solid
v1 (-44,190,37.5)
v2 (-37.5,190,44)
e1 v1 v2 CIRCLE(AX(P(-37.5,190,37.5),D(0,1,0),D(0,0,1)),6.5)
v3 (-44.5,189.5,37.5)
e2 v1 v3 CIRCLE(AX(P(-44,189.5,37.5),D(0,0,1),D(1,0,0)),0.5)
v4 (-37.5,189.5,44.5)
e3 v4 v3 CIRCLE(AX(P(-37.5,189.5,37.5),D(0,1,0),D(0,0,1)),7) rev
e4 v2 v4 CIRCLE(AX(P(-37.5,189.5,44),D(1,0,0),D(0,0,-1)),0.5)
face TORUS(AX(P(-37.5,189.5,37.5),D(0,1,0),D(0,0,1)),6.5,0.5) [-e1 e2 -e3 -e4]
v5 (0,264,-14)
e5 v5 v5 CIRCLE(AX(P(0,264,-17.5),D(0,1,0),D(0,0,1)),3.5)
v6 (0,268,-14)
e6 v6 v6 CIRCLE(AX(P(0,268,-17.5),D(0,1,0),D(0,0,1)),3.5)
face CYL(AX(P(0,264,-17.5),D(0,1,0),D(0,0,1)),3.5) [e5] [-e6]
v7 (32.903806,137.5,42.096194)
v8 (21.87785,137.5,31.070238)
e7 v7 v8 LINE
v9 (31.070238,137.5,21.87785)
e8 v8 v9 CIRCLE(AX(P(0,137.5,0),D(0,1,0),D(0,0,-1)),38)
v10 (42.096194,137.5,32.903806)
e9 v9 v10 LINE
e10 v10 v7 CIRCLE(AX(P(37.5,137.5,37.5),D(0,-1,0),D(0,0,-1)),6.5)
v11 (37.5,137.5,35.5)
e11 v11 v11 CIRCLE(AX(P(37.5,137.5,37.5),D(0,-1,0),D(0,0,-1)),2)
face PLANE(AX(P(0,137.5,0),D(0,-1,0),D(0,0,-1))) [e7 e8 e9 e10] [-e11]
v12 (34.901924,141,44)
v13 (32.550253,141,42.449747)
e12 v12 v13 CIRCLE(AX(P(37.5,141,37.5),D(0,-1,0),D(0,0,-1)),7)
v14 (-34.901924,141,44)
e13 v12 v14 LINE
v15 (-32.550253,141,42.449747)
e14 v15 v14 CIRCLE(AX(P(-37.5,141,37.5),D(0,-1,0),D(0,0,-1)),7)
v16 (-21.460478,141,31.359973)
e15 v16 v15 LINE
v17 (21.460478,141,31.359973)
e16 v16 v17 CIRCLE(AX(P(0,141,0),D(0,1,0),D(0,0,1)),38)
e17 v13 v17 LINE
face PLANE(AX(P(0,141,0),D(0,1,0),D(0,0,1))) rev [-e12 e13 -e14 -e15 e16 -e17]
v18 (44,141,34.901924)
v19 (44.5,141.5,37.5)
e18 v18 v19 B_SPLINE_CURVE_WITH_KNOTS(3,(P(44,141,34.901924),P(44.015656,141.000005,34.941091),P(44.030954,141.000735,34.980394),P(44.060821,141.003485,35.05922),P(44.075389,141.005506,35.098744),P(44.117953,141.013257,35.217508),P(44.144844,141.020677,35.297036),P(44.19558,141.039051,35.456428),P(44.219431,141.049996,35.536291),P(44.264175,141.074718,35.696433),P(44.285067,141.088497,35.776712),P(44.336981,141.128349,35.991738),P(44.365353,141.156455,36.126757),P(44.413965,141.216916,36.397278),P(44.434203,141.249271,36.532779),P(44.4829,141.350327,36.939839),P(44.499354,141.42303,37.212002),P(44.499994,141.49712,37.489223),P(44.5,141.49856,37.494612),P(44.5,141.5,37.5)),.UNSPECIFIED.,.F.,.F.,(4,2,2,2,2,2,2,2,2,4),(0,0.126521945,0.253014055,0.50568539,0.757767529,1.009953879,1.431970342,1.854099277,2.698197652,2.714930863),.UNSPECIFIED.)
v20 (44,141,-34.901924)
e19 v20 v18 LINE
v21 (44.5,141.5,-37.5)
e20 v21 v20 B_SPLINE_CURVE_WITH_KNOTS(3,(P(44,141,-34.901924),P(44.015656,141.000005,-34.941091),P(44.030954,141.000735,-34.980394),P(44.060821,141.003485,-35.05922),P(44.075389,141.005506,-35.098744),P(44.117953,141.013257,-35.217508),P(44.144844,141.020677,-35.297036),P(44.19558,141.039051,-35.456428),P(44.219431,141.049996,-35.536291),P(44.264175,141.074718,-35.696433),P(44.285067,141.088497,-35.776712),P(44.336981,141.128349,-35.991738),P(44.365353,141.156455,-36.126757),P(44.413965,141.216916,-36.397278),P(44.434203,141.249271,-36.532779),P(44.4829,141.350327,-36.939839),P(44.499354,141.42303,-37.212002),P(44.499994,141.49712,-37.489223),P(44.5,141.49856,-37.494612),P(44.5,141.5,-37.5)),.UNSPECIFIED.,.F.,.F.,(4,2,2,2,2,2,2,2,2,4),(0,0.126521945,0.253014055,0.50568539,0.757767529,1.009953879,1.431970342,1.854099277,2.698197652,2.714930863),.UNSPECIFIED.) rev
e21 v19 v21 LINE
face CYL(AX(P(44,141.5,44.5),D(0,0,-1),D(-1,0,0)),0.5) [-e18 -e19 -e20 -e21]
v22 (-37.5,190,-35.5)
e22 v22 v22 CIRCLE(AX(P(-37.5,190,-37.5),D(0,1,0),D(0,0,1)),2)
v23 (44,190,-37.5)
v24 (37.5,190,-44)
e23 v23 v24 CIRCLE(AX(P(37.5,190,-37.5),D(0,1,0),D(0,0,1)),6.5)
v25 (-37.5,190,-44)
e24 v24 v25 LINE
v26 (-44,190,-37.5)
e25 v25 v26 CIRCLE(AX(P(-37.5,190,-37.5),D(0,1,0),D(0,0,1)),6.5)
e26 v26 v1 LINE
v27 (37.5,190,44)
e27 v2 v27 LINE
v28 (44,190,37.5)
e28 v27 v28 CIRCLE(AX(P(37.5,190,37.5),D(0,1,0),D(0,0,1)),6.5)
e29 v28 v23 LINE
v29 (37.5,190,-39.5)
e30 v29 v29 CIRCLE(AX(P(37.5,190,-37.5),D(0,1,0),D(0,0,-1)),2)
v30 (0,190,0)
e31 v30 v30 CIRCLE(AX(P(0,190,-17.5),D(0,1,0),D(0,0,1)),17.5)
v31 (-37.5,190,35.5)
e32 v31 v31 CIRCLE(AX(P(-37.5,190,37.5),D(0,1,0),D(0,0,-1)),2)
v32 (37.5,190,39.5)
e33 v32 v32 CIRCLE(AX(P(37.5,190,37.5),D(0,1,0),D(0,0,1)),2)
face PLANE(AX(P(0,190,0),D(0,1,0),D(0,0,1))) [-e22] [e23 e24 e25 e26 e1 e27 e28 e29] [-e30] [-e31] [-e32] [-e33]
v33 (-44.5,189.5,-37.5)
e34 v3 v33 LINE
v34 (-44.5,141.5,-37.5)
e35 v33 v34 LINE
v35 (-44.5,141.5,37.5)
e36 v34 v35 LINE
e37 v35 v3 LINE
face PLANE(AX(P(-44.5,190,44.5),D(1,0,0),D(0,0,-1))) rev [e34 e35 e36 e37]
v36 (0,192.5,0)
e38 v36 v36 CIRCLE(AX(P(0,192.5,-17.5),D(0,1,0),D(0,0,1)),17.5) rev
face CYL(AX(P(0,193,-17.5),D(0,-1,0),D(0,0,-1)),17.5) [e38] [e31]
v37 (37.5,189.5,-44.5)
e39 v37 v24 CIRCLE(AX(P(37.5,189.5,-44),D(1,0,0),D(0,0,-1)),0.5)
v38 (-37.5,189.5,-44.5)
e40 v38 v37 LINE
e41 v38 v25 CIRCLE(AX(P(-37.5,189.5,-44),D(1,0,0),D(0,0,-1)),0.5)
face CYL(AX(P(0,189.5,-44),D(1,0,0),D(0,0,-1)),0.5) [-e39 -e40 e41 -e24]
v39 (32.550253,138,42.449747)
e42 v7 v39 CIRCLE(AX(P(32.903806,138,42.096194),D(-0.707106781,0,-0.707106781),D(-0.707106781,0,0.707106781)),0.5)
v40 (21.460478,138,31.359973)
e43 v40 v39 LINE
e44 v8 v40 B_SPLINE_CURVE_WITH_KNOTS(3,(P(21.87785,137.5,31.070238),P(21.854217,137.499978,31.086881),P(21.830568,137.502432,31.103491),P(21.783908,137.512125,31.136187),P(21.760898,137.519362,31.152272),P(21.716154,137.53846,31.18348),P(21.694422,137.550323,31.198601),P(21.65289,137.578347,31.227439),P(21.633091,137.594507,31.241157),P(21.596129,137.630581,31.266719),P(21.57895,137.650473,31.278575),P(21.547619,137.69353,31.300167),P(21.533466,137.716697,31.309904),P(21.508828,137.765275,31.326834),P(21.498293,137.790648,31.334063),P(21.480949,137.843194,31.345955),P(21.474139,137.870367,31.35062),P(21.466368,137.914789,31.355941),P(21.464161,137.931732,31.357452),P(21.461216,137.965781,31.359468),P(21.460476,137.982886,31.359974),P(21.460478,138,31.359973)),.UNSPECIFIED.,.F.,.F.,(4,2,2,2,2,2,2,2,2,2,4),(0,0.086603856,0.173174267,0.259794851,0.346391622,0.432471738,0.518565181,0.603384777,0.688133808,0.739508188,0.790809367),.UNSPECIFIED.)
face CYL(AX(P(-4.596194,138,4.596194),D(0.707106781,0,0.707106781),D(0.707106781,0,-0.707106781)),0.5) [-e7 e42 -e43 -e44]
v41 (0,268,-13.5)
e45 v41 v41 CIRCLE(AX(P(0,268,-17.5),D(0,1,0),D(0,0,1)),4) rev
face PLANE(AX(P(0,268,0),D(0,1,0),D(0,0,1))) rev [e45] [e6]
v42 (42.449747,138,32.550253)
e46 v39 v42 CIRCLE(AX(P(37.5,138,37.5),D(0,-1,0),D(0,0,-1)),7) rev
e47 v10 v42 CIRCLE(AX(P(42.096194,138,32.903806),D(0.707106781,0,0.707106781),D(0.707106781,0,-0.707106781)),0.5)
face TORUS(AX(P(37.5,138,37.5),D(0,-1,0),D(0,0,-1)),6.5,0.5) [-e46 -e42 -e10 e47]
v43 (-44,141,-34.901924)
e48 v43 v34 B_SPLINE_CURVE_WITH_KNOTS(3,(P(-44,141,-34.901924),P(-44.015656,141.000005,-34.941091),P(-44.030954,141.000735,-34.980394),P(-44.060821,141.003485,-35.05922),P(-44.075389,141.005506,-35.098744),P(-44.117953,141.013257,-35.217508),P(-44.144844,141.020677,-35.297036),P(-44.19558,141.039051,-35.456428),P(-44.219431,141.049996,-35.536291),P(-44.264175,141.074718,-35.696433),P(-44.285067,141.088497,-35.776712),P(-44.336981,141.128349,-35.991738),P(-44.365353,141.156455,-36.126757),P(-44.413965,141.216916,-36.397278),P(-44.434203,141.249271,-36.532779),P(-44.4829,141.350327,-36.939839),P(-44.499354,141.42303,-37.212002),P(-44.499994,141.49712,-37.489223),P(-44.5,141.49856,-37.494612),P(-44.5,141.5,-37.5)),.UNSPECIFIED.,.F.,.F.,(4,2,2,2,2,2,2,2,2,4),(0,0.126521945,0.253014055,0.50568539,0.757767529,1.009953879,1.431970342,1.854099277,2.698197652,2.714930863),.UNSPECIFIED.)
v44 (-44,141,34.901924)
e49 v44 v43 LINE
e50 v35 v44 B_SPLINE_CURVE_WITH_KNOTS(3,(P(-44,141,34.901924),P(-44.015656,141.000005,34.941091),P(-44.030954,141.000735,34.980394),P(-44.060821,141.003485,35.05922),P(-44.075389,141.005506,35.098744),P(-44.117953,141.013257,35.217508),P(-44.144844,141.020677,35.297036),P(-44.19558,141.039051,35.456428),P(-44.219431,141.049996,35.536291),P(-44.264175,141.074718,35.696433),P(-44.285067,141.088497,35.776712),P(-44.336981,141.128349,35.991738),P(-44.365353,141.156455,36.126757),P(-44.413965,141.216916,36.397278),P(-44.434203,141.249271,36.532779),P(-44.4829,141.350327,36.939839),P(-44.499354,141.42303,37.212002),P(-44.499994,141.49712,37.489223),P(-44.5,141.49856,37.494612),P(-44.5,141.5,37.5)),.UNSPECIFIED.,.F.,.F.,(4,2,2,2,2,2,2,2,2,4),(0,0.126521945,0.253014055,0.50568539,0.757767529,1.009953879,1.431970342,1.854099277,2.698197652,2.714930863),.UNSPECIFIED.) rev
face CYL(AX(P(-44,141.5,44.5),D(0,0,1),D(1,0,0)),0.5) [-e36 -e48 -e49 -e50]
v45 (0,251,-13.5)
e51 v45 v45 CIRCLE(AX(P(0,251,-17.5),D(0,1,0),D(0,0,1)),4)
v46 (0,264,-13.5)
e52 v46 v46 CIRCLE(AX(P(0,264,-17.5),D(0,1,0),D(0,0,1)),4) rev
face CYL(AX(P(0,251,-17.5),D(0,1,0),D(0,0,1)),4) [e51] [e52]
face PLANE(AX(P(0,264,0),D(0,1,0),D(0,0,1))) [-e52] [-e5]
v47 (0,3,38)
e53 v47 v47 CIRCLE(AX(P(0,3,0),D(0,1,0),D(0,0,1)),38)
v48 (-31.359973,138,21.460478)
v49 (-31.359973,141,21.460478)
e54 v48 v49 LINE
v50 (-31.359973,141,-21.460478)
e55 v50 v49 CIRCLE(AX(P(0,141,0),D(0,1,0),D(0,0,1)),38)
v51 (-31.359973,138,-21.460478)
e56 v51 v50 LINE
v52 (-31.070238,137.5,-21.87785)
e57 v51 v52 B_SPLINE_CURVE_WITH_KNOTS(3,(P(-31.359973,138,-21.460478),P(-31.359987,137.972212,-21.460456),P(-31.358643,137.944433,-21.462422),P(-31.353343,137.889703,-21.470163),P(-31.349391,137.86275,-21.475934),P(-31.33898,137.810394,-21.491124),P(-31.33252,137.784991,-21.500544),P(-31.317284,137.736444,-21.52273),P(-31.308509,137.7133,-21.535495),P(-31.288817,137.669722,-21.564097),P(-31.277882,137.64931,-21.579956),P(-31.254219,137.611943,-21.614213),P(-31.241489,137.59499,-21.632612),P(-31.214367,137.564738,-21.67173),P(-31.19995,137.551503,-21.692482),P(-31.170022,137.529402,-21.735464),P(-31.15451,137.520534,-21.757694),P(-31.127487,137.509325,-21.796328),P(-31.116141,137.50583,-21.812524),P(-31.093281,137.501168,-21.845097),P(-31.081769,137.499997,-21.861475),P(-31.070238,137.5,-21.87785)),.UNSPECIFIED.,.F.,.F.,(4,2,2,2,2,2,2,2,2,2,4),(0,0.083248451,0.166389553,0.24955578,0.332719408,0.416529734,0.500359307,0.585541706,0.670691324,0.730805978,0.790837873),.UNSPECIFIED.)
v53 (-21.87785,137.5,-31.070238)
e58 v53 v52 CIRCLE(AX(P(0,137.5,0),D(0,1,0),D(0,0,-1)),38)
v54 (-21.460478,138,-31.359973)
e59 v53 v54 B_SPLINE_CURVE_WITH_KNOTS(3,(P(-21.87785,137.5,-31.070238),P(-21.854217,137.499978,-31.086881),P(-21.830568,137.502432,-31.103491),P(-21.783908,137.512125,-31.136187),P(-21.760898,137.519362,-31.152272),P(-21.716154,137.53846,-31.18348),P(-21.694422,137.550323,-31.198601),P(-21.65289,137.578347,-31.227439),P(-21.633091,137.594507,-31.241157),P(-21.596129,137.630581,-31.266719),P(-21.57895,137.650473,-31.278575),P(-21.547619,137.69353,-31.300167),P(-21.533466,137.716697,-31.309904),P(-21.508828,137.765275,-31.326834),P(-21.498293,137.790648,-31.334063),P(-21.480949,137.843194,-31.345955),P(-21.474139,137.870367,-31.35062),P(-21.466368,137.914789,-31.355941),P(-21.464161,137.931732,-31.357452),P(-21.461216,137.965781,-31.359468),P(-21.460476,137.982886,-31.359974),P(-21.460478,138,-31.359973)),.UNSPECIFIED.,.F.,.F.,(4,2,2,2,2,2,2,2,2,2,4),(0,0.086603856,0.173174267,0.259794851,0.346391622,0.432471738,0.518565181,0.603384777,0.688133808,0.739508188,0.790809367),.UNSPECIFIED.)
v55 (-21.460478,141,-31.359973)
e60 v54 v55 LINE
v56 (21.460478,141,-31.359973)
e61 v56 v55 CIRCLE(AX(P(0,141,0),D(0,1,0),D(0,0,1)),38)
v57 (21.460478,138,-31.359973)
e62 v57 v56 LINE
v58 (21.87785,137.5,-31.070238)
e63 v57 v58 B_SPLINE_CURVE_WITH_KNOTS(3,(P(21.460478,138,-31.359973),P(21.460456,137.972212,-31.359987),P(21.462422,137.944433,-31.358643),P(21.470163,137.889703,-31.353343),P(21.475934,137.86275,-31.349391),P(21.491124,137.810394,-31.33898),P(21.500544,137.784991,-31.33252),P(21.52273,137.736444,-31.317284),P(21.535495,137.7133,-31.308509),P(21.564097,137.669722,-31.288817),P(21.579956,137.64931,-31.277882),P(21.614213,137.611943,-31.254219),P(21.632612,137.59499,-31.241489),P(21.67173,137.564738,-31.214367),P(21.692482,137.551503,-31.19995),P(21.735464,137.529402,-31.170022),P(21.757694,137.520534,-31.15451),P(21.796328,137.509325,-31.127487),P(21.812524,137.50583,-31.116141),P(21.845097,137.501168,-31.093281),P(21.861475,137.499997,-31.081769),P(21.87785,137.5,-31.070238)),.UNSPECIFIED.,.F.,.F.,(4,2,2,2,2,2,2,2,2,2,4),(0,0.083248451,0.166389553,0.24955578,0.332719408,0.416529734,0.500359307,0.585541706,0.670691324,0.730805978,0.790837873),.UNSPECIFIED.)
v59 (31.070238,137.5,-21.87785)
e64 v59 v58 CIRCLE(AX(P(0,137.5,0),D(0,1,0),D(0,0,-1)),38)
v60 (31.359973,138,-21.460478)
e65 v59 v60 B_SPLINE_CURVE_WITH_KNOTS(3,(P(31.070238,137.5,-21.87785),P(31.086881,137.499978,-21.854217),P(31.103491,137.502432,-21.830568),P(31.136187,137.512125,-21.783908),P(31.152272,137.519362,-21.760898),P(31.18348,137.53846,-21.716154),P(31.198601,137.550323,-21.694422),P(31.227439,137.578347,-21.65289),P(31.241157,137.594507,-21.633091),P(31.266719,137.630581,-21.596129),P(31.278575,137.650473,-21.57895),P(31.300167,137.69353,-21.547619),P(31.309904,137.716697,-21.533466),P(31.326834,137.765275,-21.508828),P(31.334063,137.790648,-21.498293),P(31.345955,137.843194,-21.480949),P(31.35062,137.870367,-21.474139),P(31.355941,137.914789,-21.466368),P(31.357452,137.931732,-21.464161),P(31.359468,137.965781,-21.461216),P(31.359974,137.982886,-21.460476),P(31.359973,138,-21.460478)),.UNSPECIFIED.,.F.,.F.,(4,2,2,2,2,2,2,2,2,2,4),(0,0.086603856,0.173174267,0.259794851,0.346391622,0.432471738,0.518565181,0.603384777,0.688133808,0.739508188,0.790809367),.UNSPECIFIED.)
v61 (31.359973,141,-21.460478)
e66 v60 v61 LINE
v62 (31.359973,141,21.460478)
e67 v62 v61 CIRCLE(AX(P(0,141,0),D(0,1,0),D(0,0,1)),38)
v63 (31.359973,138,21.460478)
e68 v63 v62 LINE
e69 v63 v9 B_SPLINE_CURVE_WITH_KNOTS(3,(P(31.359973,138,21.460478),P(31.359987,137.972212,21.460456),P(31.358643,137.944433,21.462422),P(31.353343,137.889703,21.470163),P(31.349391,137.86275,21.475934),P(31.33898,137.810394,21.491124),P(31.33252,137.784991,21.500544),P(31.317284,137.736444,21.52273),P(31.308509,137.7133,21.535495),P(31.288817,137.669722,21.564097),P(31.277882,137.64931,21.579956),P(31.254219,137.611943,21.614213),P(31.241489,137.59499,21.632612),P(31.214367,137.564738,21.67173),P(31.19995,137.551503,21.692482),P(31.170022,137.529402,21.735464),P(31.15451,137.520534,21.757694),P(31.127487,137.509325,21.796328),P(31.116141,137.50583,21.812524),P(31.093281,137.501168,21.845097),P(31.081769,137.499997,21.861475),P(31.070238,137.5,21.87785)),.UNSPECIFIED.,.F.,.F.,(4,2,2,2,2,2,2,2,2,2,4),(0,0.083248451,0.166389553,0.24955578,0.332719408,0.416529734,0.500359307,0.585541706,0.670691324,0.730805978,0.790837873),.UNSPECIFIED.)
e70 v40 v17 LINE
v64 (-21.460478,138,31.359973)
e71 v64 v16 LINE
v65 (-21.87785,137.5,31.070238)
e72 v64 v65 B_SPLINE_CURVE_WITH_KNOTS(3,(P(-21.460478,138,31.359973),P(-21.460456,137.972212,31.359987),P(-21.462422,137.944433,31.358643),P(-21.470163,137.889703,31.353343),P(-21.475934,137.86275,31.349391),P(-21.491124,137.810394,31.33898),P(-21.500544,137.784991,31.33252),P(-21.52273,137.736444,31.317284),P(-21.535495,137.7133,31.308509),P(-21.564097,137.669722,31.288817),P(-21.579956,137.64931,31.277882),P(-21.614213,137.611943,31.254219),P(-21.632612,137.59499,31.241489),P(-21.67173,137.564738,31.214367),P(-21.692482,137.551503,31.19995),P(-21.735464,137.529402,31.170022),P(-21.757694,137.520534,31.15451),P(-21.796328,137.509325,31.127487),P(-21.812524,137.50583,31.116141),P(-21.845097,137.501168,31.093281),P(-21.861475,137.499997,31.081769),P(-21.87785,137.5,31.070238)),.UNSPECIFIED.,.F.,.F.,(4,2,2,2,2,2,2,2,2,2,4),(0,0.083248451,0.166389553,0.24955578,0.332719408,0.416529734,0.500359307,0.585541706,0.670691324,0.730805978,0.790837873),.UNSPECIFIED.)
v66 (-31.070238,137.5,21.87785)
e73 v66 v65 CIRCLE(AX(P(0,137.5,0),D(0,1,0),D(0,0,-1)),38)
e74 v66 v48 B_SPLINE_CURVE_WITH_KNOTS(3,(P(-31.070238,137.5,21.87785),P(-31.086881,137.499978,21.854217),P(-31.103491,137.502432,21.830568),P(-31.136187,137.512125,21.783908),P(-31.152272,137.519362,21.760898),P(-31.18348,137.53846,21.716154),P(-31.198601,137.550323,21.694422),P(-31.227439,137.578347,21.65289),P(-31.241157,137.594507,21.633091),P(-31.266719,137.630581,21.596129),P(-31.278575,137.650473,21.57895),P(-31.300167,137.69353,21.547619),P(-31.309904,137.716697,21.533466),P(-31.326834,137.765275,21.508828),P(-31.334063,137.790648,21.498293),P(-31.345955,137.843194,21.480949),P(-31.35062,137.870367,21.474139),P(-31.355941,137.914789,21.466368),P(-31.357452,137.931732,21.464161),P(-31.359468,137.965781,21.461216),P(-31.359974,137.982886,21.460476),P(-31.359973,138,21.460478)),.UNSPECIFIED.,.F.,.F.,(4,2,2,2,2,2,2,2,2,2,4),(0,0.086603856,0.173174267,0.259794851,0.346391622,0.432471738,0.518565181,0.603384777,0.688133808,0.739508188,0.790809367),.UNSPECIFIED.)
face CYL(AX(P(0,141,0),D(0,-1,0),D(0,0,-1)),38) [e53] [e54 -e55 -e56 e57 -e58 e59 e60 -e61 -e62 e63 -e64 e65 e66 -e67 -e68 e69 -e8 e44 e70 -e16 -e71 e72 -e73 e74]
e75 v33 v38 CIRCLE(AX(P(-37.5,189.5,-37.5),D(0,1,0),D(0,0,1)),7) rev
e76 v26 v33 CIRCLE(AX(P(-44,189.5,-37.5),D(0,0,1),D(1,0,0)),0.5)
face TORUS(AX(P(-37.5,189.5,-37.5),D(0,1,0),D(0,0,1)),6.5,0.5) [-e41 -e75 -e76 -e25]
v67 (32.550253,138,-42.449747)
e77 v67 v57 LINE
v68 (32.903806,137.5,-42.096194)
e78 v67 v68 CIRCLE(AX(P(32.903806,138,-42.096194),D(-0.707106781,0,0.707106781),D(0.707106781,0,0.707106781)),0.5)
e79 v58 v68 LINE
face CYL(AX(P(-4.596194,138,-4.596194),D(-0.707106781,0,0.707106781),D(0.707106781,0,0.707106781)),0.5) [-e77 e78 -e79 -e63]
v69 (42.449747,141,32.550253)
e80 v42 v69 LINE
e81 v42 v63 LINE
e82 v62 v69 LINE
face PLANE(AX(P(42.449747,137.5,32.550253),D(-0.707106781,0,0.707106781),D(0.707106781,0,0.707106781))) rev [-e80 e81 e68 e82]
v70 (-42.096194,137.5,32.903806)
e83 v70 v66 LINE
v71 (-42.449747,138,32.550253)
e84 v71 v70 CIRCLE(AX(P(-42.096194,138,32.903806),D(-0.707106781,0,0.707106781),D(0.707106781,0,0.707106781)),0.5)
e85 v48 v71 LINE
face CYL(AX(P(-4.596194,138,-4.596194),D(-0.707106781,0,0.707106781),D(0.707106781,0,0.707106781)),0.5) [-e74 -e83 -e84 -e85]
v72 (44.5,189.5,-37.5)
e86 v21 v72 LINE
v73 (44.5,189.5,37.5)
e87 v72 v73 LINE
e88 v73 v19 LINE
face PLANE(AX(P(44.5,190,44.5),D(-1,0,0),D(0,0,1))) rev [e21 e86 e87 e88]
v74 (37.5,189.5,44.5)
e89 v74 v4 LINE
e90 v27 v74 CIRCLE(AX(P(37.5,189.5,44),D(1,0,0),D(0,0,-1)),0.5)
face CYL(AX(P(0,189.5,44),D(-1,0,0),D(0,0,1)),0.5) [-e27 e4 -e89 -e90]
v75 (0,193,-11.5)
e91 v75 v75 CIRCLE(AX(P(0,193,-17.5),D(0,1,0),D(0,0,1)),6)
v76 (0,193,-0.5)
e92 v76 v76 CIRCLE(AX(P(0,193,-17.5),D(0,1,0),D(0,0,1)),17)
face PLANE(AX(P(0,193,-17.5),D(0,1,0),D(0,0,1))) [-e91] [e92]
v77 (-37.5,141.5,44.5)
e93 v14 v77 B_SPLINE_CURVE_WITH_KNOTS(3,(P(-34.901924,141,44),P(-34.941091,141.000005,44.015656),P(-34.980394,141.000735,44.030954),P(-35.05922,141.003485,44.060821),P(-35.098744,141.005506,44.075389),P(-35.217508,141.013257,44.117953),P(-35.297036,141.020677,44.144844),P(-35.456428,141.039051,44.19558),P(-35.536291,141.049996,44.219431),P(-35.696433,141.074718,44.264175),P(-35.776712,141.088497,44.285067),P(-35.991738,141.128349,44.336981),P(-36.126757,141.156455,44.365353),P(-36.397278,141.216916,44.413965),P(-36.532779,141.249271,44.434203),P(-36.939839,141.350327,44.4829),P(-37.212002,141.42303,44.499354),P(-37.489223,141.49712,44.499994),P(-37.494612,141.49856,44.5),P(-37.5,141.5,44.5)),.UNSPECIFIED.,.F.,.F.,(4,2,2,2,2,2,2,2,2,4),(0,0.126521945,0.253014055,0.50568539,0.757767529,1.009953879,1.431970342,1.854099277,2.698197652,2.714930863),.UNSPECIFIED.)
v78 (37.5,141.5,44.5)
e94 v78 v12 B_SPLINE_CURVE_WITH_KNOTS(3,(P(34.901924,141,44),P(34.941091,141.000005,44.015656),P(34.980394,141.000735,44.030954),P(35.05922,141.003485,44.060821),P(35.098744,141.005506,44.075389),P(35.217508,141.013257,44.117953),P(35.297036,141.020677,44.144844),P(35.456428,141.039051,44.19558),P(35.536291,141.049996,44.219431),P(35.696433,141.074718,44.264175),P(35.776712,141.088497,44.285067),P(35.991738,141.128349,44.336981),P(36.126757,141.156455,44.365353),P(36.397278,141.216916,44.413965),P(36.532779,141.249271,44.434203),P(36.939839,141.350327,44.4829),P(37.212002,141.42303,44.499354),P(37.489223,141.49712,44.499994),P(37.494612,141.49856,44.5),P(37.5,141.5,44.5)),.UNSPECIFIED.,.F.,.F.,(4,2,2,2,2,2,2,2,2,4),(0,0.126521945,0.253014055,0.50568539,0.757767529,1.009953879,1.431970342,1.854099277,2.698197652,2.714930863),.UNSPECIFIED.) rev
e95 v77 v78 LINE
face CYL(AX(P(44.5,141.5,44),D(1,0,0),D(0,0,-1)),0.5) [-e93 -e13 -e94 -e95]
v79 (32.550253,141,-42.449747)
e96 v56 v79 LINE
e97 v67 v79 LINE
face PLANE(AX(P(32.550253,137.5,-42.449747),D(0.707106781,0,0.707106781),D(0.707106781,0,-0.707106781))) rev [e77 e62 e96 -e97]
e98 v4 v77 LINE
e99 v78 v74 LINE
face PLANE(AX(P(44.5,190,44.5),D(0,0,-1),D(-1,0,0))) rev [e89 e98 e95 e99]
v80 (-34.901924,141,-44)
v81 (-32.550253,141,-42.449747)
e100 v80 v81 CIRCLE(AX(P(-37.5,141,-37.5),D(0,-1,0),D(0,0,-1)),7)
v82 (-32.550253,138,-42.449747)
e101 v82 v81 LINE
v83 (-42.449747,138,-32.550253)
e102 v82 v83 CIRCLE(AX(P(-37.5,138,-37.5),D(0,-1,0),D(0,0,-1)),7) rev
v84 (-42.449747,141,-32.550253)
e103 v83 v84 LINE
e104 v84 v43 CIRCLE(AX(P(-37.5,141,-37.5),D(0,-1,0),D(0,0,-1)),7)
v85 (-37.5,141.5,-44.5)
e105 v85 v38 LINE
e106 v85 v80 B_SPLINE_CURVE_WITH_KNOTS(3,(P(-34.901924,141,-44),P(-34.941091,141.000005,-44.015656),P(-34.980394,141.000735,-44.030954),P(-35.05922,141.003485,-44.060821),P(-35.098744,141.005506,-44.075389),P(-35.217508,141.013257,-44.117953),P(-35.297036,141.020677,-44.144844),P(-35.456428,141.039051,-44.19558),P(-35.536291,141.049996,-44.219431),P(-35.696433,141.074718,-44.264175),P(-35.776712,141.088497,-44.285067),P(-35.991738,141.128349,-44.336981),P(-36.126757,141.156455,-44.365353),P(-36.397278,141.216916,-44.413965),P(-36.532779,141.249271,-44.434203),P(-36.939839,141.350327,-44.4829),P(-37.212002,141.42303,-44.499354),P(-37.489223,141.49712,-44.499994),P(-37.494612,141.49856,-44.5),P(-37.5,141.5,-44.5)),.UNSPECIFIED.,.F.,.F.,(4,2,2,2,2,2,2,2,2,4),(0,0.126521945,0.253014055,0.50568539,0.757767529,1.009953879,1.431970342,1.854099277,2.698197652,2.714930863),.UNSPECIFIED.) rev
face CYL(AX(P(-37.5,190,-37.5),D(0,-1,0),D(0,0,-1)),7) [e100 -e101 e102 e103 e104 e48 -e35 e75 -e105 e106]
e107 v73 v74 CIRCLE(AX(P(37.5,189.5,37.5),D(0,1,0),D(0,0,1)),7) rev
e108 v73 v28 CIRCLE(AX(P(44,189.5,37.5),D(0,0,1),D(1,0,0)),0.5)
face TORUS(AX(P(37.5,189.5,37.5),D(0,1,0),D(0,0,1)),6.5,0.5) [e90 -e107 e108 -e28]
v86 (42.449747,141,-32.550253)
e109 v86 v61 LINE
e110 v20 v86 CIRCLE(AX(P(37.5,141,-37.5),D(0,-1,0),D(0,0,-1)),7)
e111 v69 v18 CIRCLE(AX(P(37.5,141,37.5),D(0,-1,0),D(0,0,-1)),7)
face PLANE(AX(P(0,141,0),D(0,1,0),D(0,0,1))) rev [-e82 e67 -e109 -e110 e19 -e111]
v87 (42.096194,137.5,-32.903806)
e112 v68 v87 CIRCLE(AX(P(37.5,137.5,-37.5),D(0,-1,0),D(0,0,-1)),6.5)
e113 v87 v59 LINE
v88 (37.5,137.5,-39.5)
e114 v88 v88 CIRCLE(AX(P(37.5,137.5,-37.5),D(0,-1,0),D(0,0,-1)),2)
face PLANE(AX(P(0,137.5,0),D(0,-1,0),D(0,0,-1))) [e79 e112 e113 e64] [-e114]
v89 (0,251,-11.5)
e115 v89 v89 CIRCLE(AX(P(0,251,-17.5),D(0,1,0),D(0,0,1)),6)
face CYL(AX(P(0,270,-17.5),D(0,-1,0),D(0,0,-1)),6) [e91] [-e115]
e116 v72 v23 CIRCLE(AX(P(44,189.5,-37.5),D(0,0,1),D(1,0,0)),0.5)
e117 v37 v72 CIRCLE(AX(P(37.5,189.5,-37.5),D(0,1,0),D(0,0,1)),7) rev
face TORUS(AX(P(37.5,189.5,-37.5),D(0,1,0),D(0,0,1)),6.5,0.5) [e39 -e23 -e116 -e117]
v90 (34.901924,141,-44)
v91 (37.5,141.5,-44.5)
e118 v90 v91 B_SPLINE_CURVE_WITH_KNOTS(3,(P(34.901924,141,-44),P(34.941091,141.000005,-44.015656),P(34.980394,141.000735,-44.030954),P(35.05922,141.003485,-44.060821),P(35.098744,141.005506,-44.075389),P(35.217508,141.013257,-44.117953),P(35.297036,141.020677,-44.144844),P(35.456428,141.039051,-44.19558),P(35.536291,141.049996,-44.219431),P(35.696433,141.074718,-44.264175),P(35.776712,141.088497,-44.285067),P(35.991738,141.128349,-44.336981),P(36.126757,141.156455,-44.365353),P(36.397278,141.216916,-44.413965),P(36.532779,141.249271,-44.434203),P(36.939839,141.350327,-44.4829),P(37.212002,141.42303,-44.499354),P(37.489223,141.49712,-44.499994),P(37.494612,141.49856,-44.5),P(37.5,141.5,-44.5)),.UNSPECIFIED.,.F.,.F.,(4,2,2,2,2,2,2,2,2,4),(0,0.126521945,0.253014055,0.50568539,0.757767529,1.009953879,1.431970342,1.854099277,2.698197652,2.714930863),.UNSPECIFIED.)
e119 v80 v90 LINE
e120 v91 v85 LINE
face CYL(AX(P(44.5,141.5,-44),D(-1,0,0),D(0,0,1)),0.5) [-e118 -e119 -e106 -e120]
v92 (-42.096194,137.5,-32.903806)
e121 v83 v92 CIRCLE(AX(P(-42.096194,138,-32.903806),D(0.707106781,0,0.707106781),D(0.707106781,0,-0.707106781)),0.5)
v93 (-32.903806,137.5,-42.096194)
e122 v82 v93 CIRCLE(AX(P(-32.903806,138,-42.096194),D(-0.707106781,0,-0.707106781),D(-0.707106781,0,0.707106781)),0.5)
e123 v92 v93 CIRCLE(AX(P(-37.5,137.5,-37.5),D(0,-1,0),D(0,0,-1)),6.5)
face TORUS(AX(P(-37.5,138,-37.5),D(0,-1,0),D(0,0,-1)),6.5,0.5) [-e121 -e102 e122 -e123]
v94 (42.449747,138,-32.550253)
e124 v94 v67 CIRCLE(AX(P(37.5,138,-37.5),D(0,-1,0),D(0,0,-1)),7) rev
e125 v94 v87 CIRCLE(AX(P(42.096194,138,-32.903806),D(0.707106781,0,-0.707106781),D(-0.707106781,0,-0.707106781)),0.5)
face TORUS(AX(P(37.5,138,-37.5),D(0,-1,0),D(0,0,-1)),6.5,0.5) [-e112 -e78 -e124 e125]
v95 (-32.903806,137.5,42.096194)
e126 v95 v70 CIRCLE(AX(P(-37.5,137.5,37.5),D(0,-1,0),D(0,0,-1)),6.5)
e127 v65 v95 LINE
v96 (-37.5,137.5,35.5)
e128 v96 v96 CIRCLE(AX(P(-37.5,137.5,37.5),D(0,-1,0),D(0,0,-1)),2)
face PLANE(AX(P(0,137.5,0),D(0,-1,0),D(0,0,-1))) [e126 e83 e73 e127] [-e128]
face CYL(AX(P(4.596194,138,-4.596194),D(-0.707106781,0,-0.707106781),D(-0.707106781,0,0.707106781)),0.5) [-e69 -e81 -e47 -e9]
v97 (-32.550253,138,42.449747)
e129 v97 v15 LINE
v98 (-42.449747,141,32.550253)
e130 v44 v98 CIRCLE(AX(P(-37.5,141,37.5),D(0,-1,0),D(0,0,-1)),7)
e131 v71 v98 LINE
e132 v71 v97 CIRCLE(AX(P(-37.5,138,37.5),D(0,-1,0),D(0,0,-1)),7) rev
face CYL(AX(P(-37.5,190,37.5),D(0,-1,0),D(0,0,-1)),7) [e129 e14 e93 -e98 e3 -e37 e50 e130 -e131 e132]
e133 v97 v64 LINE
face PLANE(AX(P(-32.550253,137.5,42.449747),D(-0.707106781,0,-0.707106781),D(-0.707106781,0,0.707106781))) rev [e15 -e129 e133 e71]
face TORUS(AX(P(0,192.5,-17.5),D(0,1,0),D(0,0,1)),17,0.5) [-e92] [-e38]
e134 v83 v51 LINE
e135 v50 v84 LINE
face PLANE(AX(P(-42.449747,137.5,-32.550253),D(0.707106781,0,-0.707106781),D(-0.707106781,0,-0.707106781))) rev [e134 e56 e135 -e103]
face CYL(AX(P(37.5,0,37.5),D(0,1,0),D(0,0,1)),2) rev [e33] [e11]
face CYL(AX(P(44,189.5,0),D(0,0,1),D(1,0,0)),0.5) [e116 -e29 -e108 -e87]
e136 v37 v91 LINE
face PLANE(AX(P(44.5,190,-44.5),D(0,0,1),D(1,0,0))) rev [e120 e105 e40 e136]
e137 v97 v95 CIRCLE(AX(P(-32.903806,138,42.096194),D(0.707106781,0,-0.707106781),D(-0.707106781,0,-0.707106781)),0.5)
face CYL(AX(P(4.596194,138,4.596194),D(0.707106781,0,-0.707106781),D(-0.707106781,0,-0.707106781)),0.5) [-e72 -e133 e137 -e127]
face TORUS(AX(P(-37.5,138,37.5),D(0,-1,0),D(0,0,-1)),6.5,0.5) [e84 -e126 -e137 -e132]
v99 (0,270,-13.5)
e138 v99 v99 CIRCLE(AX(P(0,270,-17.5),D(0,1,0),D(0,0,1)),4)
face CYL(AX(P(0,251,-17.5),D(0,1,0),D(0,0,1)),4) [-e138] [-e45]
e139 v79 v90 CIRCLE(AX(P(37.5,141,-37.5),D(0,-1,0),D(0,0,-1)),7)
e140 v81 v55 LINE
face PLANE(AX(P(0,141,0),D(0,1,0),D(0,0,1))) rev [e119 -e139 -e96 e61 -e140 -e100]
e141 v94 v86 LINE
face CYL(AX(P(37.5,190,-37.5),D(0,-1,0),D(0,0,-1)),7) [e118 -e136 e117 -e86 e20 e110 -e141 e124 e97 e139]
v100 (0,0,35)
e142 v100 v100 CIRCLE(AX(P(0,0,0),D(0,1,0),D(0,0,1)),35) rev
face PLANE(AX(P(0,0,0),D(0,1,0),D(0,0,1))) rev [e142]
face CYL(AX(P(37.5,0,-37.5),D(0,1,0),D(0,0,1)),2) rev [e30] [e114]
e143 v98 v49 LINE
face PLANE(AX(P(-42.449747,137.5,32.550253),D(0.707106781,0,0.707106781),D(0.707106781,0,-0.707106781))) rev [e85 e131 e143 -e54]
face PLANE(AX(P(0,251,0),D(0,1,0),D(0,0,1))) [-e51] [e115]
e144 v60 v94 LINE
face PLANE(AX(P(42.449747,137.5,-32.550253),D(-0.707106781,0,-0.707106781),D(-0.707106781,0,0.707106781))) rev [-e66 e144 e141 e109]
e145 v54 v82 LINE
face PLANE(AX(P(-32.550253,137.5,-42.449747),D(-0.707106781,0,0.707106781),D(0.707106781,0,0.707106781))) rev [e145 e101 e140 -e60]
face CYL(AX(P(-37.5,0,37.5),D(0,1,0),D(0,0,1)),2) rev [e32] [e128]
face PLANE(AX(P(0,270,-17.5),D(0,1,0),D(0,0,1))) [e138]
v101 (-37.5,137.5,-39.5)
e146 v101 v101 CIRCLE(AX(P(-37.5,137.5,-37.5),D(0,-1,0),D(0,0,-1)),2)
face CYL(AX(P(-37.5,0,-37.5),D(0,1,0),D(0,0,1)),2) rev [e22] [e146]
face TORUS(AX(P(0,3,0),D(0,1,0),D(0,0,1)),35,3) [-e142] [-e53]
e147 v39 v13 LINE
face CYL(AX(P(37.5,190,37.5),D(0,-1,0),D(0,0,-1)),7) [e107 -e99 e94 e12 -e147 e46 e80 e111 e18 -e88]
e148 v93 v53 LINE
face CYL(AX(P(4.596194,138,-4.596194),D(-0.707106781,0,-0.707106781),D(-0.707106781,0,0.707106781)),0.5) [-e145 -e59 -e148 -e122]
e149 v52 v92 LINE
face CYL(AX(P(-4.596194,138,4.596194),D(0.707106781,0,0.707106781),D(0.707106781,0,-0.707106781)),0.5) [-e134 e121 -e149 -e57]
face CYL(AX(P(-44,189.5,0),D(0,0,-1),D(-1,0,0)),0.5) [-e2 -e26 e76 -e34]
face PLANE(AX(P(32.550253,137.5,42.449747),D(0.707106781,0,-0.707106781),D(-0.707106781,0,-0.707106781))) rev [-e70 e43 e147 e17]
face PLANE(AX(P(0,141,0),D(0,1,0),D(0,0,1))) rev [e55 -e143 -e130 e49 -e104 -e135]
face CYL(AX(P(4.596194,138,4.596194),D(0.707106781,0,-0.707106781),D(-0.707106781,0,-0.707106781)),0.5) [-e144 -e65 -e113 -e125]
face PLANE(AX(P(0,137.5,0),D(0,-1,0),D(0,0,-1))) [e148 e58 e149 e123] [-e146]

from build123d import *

# Parameters (mm, degrees)
SKETCH1_R           = 38
BOSS_EXTRUDE1_DEPTH = 141
FILLET1_R           = 3
SKETCH2_W           = 89
SKETCH2_H           = 89
BOSS_EXTRUDE2_DEPTH = 49
FILLET2_R           = 7
BOSS_EXTRUDE3_DEPTH = 3.5
FILLET3_R           = 0.5
SKETCH3_R           = 2
CUT_EXTRUDE3_DEPTH  = 201.151192896
SKETCH5_R           = 6
BOSS_EXTRUDE4_DEPTH = 80
SKETCH6_OUTSIDE_W   = 150.58
SKETCH6_OUTSIDE_H   = 150.58
SKETCH6_OUTSIDE_R   = 4
CUT_EXTRUDE4_DEPTH  = 19
SKETCH7_OUTSIDE_W   = 150.58
SKETCH7_OUTSIDE_H   = 150.58
SKETCH7_OUTSIDE_R   = 3.5
CUT_EXTRUDE5_DEPTH  = 4
SKETCH8_R           = 17.5
BOSS_EXTRUDE5_DEPTH = 3
FILLET4_R           = 0.5


with BuildPart() as part:
    # Sketch1 → Boss-Extrude1 (new body)
    with BuildSketch(Plane(origin=(0, 0, 0), x_dir=(1, 0, 0), z_dir=(0, 1, 0))):
        with Locations(Location((0, 0, 0), (0, 0, 270))):
            Circle(SKETCH1_R)
    extrude(amount=BOSS_EXTRUDE1_DEPTH)

    # Fillet1
    fillet1_edges = [part.edges().sort_by_distance(p)[0] for p in [
        (0, 0, -38),
    ]]
    fillet(fillet1_edges, radius=FILLET1_R)

    # Sketch2 → Boss-Extrude2 (add)
    with BuildSketch(Plane(origin=(0, 141, 0), x_dir=(1, 0, 0), z_dir=(0, 1, 0))):
        Rectangle(SKETCH2_W, SKETCH2_H)
    extrude(amount=BOSS_EXTRUDE2_DEPTH)

    # Fillet2
    fillet2_edges = [part.edges().sort_by_distance(p)[0] for p in [
        (44.5, 165.5, 44.5),
        (44.5, 165.5, -44.5),
        (-44.5, 165.5, -44.5),
        (-44.5, 165.5, 44.5),
    ]]
    fillet(fillet2_edges, radius=FILLET2_R)

    # Sketch4 → Boss-Extrude3 (add)
    with BuildSketch(Plane.XZ.offset(-141)):
        with BuildLine():
            Line((-42.449747468, 32.550252532), (-31.359972761, 21.460477824))
            ThreePointArc((-31.359972761, 21.460477824), (-26.870057685, 26.870057685), (-21.460477824, 31.359972761))
            Line((-21.460477824, 31.359972761), (-32.550252532, 42.449747468))
            ThreePointArc((-32.550252532, 42.449747468), (-42.449747468, 42.449747468), (-42.449747468, 32.550252532))
        make_face()
        with BuildLine():
            Line((32.550252532, 42.449747468), (21.460477824, 31.359972761))
            ThreePointArc((21.460477824, 31.359972761), (26.870057685, 26.870057685), (31.359972761, 21.460477824))
            Line((31.359972761, 21.460477824), (42.449747468, 32.550252532))
            ThreePointArc((42.449747468, 32.550252532), (42.449747468, 42.449747468), (32.550252532, 42.449747468))
        make_face()
        with BuildLine():
            Line((42.449747468, -32.550252532), (31.359972761, -21.460477824))
            ThreePointArc((31.359972761, -21.460477824), (26.870057685, -26.870057685), (21.460477824, -31.359972761))
            Line((21.460477824, -31.359972761), (32.550252532, -42.449747468))
            ThreePointArc((32.550252532, -42.449747468), (42.449747468, -42.449747468), (42.449747468, -32.550252532))
        make_face()
        with BuildLine():
            Line((-32.550252532, -42.449747468), (-21.460477824, -31.359972761))
            ThreePointArc((-21.460477824, -31.359972761), (-26.870057685, -26.870057685), (-31.359972761, -21.460477824))
            Line((-31.359972761, -21.460477824), (-42.449747468, -32.550252532))
            ThreePointArc((-42.449747468, -32.550252532), (-42.449747468, -42.449747468), (-32.550252532, -42.449747468))
        make_face()
    extrude(amount=BOSS_EXTRUDE3_DEPTH)

    # Fillet3
    # the kernel refuses this fillet: 0.5 mm, written as the material it takes off along each edge
    with BuildSketch(Plane(origin=(44.5, 141, -38.75), x_dir=(0, 1, 0), z_dir=(0, 0, 1))) as fillet3_piece_1_section:
        with BuildLine():
            CenterArc((FILLET3_R, FILLET3_R), FILLET3_R, 180, 90)
            Line((0, FILLET3_R), (0, 0))
            Line((0, 0), (FILLET3_R, 0))
        make_face()
    fillet3_piece_1 = extrude(amount=77.5, mode=Mode.PRIVATE)
    fillet3_piece_1 = fillet3_piece_1 - Plane(origin=(37.5, 141.115144567, 37.5), x_dir=(0, 0, 1), z_dir=(0, 1, 0)) * Cylinder(7, 157, mode=Mode.PRIVATE)
    fillet3_piece_1 = fillet3_piece_1 - Plane(origin=(37.5, 141.115144567, -37.5), x_dir=(1, 0, 0), z_dir=(0, 1, 0)) * Cylinder(7, 157, mode=Mode.PRIVATE)
    add(fillet3_piece_1, mode=Mode.SUBTRACT)
    with BuildSketch(Plane(origin=(44.5, 190, -37.5), x_dir=(-1, 0, 0), z_dir=(0, 0, 1)), Plane(origin=(-44.5, 190, 37.5), x_dir=(1, 0, 0), z_dir=(0, 0, -1)), Plane(origin=(-37.5, 190, -44.5), x_dir=(0, 0, 1), z_dir=(1, 0, 0))) as fillet3_piece_2:
        with BuildLine():
            CenterArc((FILLET3_R, FILLET3_R), FILLET3_R, 180, 90)
            Line((0, FILLET3_R), (0, 0))
            Line((0, 0), (FILLET3_R, 0))
        make_face()
    extrude(amount=75, mode=Mode.SUBTRACT)
    with BuildSketch(Plane(origin=(-44.5, 141, 38.75), x_dir=(0, 1, 0), z_dir=(0, 0, -1))) as fillet3_piece_3_section:
        with BuildLine():
            CenterArc((FILLET3_R, FILLET3_R), FILLET3_R, 180, 90)
            Line((0, FILLET3_R), (0, 0))
            Line((0, 0), (FILLET3_R, 0))
        make_face()
    fillet3_piece_3 = extrude(amount=77.5, mode=Mode.PRIVATE)
    fillet3_piece_3 = fillet3_piece_3 - Plane(origin=(-37.5, 141.115144625, 37.5), x_dir=(0, 0, 1), z_dir=(0, 1, 0)) * Cylinder(7, 157, mode=Mode.PRIVATE)
    fillet3_piece_3 = fillet3_piece_3 - Plane(origin=(-37.5, 141.115144625, -37.5), x_dir=(-1, 0, 0), z_dir=(0, 1, 0)) * Cylinder(7, 157, mode=Mode.PRIVATE)
    add(fillet3_piece_3, mode=Mode.SUBTRACT)
    with BuildSketch(Plane(origin=(-38.75, 141, -44.5), x_dir=(0, 1, 0), z_dir=(1, 0, 0))) as fillet3_piece_4_section:
        with BuildLine():
            CenterArc((FILLET3_R, FILLET3_R), FILLET3_R, 180, 90)
            Line((0, FILLET3_R), (0, 0))
            Line((0, 0), (FILLET3_R, 0))
        make_face()
    fillet3_piece_4 = extrude(amount=77.5, mode=Mode.PRIVATE)
    fillet3_piece_4 = fillet3_piece_4 - Plane(origin=(37.5, 141.115144428, -37.5), x_dir=(1, 0, 0), z_dir=(0, 1, 0)) * Cylinder(7, 157, mode=Mode.PRIVATE)
    fillet3_piece_4 = fillet3_piece_4 - Plane(origin=(-37.5, 141.115144428, -37.5), x_dir=(-1, 0, 0), z_dir=(0, 1, 0)) * Cylinder(7, 157, mode=Mode.PRIVATE)
    add(fillet3_piece_4, mode=Mode.SUBTRACT)
    with BuildSketch(Plane(origin=(38.75, 141, 44.5), x_dir=(0, 1, 0), z_dir=(-1, 0, 0))) as fillet3_piece_5_section:
        with BuildLine():
            CenterArc((FILLET3_R, FILLET3_R), FILLET3_R, 180, 90)
            Line((0, FILLET3_R), (0, 0))
            Line((0, 0), (FILLET3_R, 0))
        make_face()
    fillet3_piece_5 = extrude(amount=77.5, mode=Mode.PRIVATE)
    fillet3_piece_5 = fillet3_piece_5 - Plane(origin=(37.5, 141.115144726, 37.5), x_dir=(0, 0, 1), z_dir=(0, 1, 0)) * Cylinder(7, 157, mode=Mode.PRIVATE)
    fillet3_piece_5 = fillet3_piece_5 - Plane(origin=(-37.5, 141.115144726, 37.5), x_dir=(0, 0, 1), z_dir=(0, 1, 0)) * Cylinder(7, 157, mode=Mode.PRIVATE)
    add(fillet3_piece_5, mode=Mode.SUBTRACT)
    with BuildSketch(Plane(origin=(37.5, 190, 44.5), x_dir=(0, -1, 0), z_dir=(-1, 0, 0))) as fillet3_piece_6:
        with BuildLine():
            CenterArc((FILLET3_R, -FILLET3_R), FILLET3_R, 90, 90)
            Line((0, -FILLET3_R), (0, 0))
            Line((0, 0), (FILLET3_R, 0))
        make_face()
    extrude(amount=75, mode=Mode.SUBTRACT)
    with BuildSketch(Plane(origin=(-37.5, 190, -37.5), x_dir=(-1, 0, 0), z_dir=(0, 0, 1))) as fillet3_piece_7:
        with BuildLine():
            CenterArc((7 - FILLET3_R, FILLET3_R), FILLET3_R, 270, 90)
            Line((7, FILLET3_R), (7, 0))
            Line((7, 0), (7 - FILLET3_R, 0))
        make_face()
    revolve(axis=Axis((-37.5, 190, -37.5), (0, -1, 0)), revolution_arc=90, mode=Mode.SUBTRACT)
    with BuildSketch(Plane(origin=(-37.5, 190, 37.5), x_dir=(0, 0, 1), z_dir=(1, 0, 0))) as fillet3_piece_8:
        with BuildLine():
            CenterArc((7 - FILLET3_R, FILLET3_R), FILLET3_R, 270, 90)
            Line((7 - FILLET3_R, 0), (7, 0))
            Line((7, 0), (7, FILLET3_R))
        make_face()
    revolve(axis=Axis((-37.5, 190, 37.5), (0, -1, 0)), revolution_arc=90, mode=Mode.SUBTRACT)
    with BuildSketch(Plane(origin=(37.5, 190, -37.5), x_dir=(1, 0, 0), z_dir=(0, 0, 1))) as fillet3_piece_9:
        with BuildLine():
            CenterArc((7 - FILLET3_R, -FILLET3_R), FILLET3_R, 0, 90)
            Line((7, -FILLET3_R), (7, 0))
            Line((7, 0), (7 - FILLET3_R, 0))
        make_face()
    revolve(axis=Axis((37.5, 190, -37.5), (0, 1, 0)), revolution_arc=90, mode=Mode.SUBTRACT)
    with BuildSketch(Plane(origin=(37.5, 190, 37.5), x_dir=(0, 0, 1), z_dir=(-1, 0, 0))) as fillet3_piece_10:
        with BuildLine():
            CenterArc((7 - FILLET3_R, -FILLET3_R), FILLET3_R, 0, 90)
            Line((7 - FILLET3_R, 0), (7, 0))
            Line((7, 0), (7, -FILLET3_R))
        make_face()
    revolve(axis=Axis((37.5, 190, 37.5), (0, 1, 0)), revolution_arc=90, mode=Mode.SUBTRACT)
    with BuildSketch(Plane(origin=(-20.576594348, 137.5, 30.476089284), x_dir=(0, 1, 0), z_dir=(-0.7071067811865467, 0, 0.7071067811865485))) as fillet3_piece_11_section:
        with BuildLine():
            CenterArc((FILLET3_R, FILLET3_R), FILLET3_R, 180, 90)
            Line((0, FILLET3_R), (0, 0))
            Line((0, 0), (FILLET3_R, 0))
        make_face()
    fillet3_piece_11 = extrude(amount=16.933309795, mode=Mode.PRIVATE)
    fillet3_piece_11 = fillet3_piece_11 - Plane(origin=(0, 137.613277893, 0), x_dir=(0, 0, 1), z_dir=(0, -1, 0)) * Cylinder(38, 36, mode=Mode.PRIVATE)
    add(fillet3_piece_11, mode=Mode.SUBTRACT)
    with BuildSketch(Plane(origin=(-37.5, 137.5, 37.5), x_dir=(0.7071067811865465, 0, 0.7071067811865486), z_dir=(0.7071067811865486, 0, -0.7071067811865465))) as fillet3_piece_12:
        with BuildLine():
            CenterArc((7 - FILLET3_R, -FILLET3_R), FILLET3_R, 0, 90)
            Line((7 - FILLET3_R, 0), (7, 0))
            Line((7, 0), (7, -FILLET3_R))
        make_face()
    revolve(axis=Axis((-37.5, 137.5, 37.5), (0, -1, 0)), revolution_arc=180, mode=Mode.SUBTRACT)
    with BuildSketch(Plane(origin=(-42.449747468, 137.5, 32.550252532), x_dir=(0.7071067811865476, 0, 0.7071067811865476), z_dir=(0.7071067811865476, 0, -0.7071067811865476))) as fillet3_piece_13_section:
        with BuildLine():
            CenterArc((FILLET3_R, -FILLET3_R), FILLET3_R, 90, 90)
            Line((0, -FILLET3_R), (0, 0))
            Line((0, 0), (FILLET3_R, 0))
        make_face()
    fillet3_piece_13 = extrude(amount=16.933309795, mode=Mode.PRIVATE)
    fillet3_piece_13 = fillet3_piece_13 - Plane(origin=(0, 137.613277909, 0), x_dir=(0, 0, 1), z_dir=(0, -1, 0)) * Cylinder(38, 36, mode=Mode.PRIVATE)
    add(fillet3_piece_13, mode=Mode.SUBTRACT)
    with BuildSketch(Plane(origin=(30.476089284, 137.5, 20.576594348), x_dir=(0, 1, 0), z_dir=(0.7071067811865502, 0, 0.7071067811865448))) as fillet3_piece_14_section:
        with BuildLine():
            CenterArc((FILLET3_R, FILLET3_R), FILLET3_R, 180, 90)
            Line((0, FILLET3_R), (0, 0))
            Line((0, 0), (FILLET3_R, 0))
        make_face()
    fillet3_piece_14 = extrude(amount=16.933309795, mode=Mode.PRIVATE)
    fillet3_piece_14 = fillet3_piece_14 - Plane(origin=(0, 137.613277924, 0), x_dir=(0, 0, 1), z_dir=(0, -1, 0)) * Cylinder(38, 36, mode=Mode.PRIVATE)
    add(fillet3_piece_14, mode=Mode.SUBTRACT)
    with BuildSketch(Plane(origin=(37.5, 137.5, 37.5), x_dir=(0.707106781186547, 0, -0.707106781186548), z_dir=(-0.707106781186548, 0, -0.707106781186547))) as fillet3_piece_15:
        with BuildLine():
            CenterArc((7 - FILLET3_R, -FILLET3_R), FILLET3_R, 0, 90)
            Line((7 - FILLET3_R, 0), (7, 0))
            Line((7, 0), (7, -FILLET3_R))
        make_face()
    revolve(axis=Axis((37.5, 137.5, 37.5), (0, -1, 0)), revolution_arc=180, mode=Mode.SUBTRACT)
    with BuildSketch(Plane(origin=(32.550252532, 137.5, 42.449747468), x_dir=(0, 1, 0), z_dir=(-0.7071067811865498, 0, -0.7071067811865452))) as fillet3_piece_16_section:
        with BuildLine():
            CenterArc((FILLET3_R, FILLET3_R), FILLET3_R, 180, 90)
            Line((0, FILLET3_R), (0, 0))
            Line((0, 0), (FILLET3_R, 0))
        make_face()
    fillet3_piece_16 = extrude(amount=16.933309795, mode=Mode.PRIVATE)
    fillet3_piece_16 = fillet3_piece_16 - Plane(origin=(0, 137.61327792, 0), x_dir=(0, 0, 1), z_dir=(0, -1, 0)) * Cylinder(38, 36, mode=Mode.PRIVATE)
    add(fillet3_piece_16, mode=Mode.SUBTRACT)
    with BuildSketch(Plane(origin=(20.576594348, 137.5, -30.476089284), x_dir=(0, 1, 0), z_dir=(0.7071067811865417, 0, -0.7071067811865535))) as fillet3_piece_17_section:
        with BuildLine():
            CenterArc((FILLET3_R, FILLET3_R), FILLET3_R, 180, 90)
            Line((0, FILLET3_R), (0, 0))
            Line((0, 0), (FILLET3_R, 0))
        make_face()
    fillet3_piece_17 = extrude(amount=16.933309795, mode=Mode.PRIVATE)
    fillet3_piece_17 = fillet3_piece_17 - Plane(origin=(0, 137.613277924, 0), x_dir=(0, 0, 1), z_dir=(0, -1, 0)) * Cylinder(38, 36, mode=Mode.PRIVATE)
    add(fillet3_piece_17, mode=Mode.SUBTRACT)
    with BuildSketch(Plane(origin=(37.5, 137.5, -37.5), x_dir=(-0.707106781186552, 0, -0.7071067811865429), z_dir=(-0.7071067811865429, 0, 0.707106781186552))) as fillet3_piece_18:
        with BuildLine():
            CenterArc((7 - FILLET3_R, -FILLET3_R), FILLET3_R, 0, 90)
            Line((7 - FILLET3_R, 0), (7, 0))
            Line((7, 0), (7, -FILLET3_R))
        make_face()
    revolve(axis=Axis((37.5, 137.5, -37.5), (0, -1, 0)), revolution_arc=180, mode=Mode.SUBTRACT)
    with BuildSketch(Plane(origin=(42.449747468, 137.5, -32.550252532), x_dir=(-0.7071067811865527, 0, -0.7071067811865425), z_dir=(-0.7071067811865425, 0, 0.7071067811865527))) as fillet3_piece_19_section:
        with BuildLine():
            CenterArc((FILLET3_R, -FILLET3_R), FILLET3_R, 90, 90)
            Line((0, -FILLET3_R), (0, 0))
            Line((0, 0), (FILLET3_R, 0))
        make_face()
    fillet3_piece_19 = extrude(amount=16.933309795, mode=Mode.PRIVATE)
    fillet3_piece_19 = fillet3_piece_19 - Plane(origin=(0, 137.613277909, 0), x_dir=(0, 0, 1), z_dir=(0, -1, 0)) * Cylinder(38, 36, mode=Mode.PRIVATE)
    add(fillet3_piece_19, mode=Mode.SUBTRACT)
    with BuildSketch(Plane(origin=(-30.476089284, 137.5, -20.576594348), x_dir=(0, 1, 0), z_dir=(-0.7071067811865558, 0, -0.7071067811865392))) as fillet3_piece_20_section:
        with BuildLine():
            CenterArc((FILLET3_R, FILLET3_R), FILLET3_R, 180, 90)
            Line((0, FILLET3_R), (0, 0))
            Line((0, 0), (FILLET3_R, 0))
        make_face()
    fillet3_piece_20 = extrude(amount=16.933309795, mode=Mode.PRIVATE)
    fillet3_piece_20 = fillet3_piece_20 - Plane(origin=(0, 137.613277893, 0), x_dir=(0, 0, 1), z_dir=(0, -1, 0)) * Cylinder(38, 36, mode=Mode.PRIVATE)
    add(fillet3_piece_20, mode=Mode.SUBTRACT)
    with BuildSketch(Plane(origin=(-37.5, 137.5, -37.5), x_dir=(-0.7071067811865425, 0, 0.7071067811865526), z_dir=(0.7071067811865526, 0, 0.7071067811865425))) as fillet3_piece_21:
        with BuildLine():
            CenterArc((7 - FILLET3_R, -FILLET3_R), FILLET3_R, 0, 90)
            Line((7 - FILLET3_R, 0), (7, 0))
            Line((7, 0), (7, -FILLET3_R))
        make_face()
    revolve(axis=Axis((-37.5, 137.5, -37.5), (0, -1, 0)), revolution_arc=180, mode=Mode.SUBTRACT)
    with BuildSketch(Plane(origin=(-32.550252532, 137.5, -42.449747468), x_dir=(-0.7071067811865404, 0, 0.7071067811865548), z_dir=(0.7071067811865548, 0, 0.7071067811865402))) as fillet3_piece_22_section:
        with BuildLine():
            CenterArc((FILLET3_R, -FILLET3_R), FILLET3_R, 90, 90)
            Line((0, -FILLET3_R), (0, 0))
            Line((0, 0), (FILLET3_R, 0))
        make_face()
    fillet3_piece_22 = extrude(amount=16.933309795, mode=Mode.PRIVATE)
    fillet3_piece_22 = fillet3_piece_22 - Plane(origin=(0, 137.613277909, 0), x_dir=(0, 0, 1), z_dir=(0, -1, 0)) * Cylinder(38, 36, mode=Mode.PRIVATE)
    add(fillet3_piece_22, mode=Mode.SUBTRACT)

    # Sketch3 → Cut-Extrude3 (cut, through all)
    with BuildSketch(Plane(origin=(0, 190, 0), x_dir=(1, 0, 0), z_dir=(0, 1, 0))):
        with Locations(Location((-37.5, 37.5, 0), (0, 0, 270))):
            Circle(SKETCH3_R)
        with Locations(Location((37.5, 37.5, 0), (0, 0, 90))):
            Circle(SKETCH3_R)
        with Locations(Location((37.5, -37.5, 0), (0, 0, 270))):
            Circle(SKETCH3_R)
        with Locations(Location((-37.5, -37.5, 0), (0, 0, 90))):
            Circle(SKETCH3_R)
    extrude(amount=-CUT_EXTRUDE3_DEPTH, mode=Mode.SUBTRACT)

    # Sketch5 → Boss-Extrude4 (add)
    with BuildSketch(Plane(origin=(0, 190, 0), x_dir=(1, 0, 0), z_dir=(0, 1, 0))):
        with Locations(Location((0, 17.5, 0), (0, 0, 270))):
            Circle(SKETCH5_R)
    extrude(amount=BOSS_EXTRUDE4_DEPTH)

    # Sketch6 outside → Cut-Extrude4 (cut)
    with BuildSketch(Plane(origin=(0, 270, 0), x_dir=(1, 0, 0), z_dir=(0, 1, 0))):
        Rectangle(SKETCH6_OUTSIDE_W, SKETCH6_OUTSIDE_H)
        with Locations(Location((0, 17.5, 0), (0, 0, 270))):
            Circle(SKETCH6_OUTSIDE_R, mode=Mode.SUBTRACT)
    extrude(amount=-CUT_EXTRUDE4_DEPTH, mode=Mode.SUBTRACT)

    # Sketch7 outside → Cut-Extrude5 (cut)
    with BuildSketch(Plane(origin=(0, 268, 0), x_dir=(1, 0, 0), z_dir=(0, 1, 0))):
        Rectangle(SKETCH7_OUTSIDE_W, SKETCH7_OUTSIDE_H)
        with Locations(Location((0, 17.5, 0), (0, 0, 270))):
            Circle(SKETCH7_OUTSIDE_R, mode=Mode.SUBTRACT)
    extrude(amount=-CUT_EXTRUDE5_DEPTH, mode=Mode.SUBTRACT)

    # Sketch8 → Boss-Extrude5 (add)
    with BuildSketch(Plane(origin=(0, 190, 0), x_dir=(1, 0, 0), z_dir=(0, 1, 0))):
        with Locations(Location((0, 17.5, 0), (0, 0, 270))):
            Circle(SKETCH8_R)
    extrude(amount=BOSS_EXTRUDE5_DEPTH)

    # Fillet4
    fillet4_edges = [part.edges().sort_by_distance(p)[0] for p in [
        (0, 193, -35),
    ]]
    fillet(fillet4_edges, radius=FILLET4_R)


solid = part.part
